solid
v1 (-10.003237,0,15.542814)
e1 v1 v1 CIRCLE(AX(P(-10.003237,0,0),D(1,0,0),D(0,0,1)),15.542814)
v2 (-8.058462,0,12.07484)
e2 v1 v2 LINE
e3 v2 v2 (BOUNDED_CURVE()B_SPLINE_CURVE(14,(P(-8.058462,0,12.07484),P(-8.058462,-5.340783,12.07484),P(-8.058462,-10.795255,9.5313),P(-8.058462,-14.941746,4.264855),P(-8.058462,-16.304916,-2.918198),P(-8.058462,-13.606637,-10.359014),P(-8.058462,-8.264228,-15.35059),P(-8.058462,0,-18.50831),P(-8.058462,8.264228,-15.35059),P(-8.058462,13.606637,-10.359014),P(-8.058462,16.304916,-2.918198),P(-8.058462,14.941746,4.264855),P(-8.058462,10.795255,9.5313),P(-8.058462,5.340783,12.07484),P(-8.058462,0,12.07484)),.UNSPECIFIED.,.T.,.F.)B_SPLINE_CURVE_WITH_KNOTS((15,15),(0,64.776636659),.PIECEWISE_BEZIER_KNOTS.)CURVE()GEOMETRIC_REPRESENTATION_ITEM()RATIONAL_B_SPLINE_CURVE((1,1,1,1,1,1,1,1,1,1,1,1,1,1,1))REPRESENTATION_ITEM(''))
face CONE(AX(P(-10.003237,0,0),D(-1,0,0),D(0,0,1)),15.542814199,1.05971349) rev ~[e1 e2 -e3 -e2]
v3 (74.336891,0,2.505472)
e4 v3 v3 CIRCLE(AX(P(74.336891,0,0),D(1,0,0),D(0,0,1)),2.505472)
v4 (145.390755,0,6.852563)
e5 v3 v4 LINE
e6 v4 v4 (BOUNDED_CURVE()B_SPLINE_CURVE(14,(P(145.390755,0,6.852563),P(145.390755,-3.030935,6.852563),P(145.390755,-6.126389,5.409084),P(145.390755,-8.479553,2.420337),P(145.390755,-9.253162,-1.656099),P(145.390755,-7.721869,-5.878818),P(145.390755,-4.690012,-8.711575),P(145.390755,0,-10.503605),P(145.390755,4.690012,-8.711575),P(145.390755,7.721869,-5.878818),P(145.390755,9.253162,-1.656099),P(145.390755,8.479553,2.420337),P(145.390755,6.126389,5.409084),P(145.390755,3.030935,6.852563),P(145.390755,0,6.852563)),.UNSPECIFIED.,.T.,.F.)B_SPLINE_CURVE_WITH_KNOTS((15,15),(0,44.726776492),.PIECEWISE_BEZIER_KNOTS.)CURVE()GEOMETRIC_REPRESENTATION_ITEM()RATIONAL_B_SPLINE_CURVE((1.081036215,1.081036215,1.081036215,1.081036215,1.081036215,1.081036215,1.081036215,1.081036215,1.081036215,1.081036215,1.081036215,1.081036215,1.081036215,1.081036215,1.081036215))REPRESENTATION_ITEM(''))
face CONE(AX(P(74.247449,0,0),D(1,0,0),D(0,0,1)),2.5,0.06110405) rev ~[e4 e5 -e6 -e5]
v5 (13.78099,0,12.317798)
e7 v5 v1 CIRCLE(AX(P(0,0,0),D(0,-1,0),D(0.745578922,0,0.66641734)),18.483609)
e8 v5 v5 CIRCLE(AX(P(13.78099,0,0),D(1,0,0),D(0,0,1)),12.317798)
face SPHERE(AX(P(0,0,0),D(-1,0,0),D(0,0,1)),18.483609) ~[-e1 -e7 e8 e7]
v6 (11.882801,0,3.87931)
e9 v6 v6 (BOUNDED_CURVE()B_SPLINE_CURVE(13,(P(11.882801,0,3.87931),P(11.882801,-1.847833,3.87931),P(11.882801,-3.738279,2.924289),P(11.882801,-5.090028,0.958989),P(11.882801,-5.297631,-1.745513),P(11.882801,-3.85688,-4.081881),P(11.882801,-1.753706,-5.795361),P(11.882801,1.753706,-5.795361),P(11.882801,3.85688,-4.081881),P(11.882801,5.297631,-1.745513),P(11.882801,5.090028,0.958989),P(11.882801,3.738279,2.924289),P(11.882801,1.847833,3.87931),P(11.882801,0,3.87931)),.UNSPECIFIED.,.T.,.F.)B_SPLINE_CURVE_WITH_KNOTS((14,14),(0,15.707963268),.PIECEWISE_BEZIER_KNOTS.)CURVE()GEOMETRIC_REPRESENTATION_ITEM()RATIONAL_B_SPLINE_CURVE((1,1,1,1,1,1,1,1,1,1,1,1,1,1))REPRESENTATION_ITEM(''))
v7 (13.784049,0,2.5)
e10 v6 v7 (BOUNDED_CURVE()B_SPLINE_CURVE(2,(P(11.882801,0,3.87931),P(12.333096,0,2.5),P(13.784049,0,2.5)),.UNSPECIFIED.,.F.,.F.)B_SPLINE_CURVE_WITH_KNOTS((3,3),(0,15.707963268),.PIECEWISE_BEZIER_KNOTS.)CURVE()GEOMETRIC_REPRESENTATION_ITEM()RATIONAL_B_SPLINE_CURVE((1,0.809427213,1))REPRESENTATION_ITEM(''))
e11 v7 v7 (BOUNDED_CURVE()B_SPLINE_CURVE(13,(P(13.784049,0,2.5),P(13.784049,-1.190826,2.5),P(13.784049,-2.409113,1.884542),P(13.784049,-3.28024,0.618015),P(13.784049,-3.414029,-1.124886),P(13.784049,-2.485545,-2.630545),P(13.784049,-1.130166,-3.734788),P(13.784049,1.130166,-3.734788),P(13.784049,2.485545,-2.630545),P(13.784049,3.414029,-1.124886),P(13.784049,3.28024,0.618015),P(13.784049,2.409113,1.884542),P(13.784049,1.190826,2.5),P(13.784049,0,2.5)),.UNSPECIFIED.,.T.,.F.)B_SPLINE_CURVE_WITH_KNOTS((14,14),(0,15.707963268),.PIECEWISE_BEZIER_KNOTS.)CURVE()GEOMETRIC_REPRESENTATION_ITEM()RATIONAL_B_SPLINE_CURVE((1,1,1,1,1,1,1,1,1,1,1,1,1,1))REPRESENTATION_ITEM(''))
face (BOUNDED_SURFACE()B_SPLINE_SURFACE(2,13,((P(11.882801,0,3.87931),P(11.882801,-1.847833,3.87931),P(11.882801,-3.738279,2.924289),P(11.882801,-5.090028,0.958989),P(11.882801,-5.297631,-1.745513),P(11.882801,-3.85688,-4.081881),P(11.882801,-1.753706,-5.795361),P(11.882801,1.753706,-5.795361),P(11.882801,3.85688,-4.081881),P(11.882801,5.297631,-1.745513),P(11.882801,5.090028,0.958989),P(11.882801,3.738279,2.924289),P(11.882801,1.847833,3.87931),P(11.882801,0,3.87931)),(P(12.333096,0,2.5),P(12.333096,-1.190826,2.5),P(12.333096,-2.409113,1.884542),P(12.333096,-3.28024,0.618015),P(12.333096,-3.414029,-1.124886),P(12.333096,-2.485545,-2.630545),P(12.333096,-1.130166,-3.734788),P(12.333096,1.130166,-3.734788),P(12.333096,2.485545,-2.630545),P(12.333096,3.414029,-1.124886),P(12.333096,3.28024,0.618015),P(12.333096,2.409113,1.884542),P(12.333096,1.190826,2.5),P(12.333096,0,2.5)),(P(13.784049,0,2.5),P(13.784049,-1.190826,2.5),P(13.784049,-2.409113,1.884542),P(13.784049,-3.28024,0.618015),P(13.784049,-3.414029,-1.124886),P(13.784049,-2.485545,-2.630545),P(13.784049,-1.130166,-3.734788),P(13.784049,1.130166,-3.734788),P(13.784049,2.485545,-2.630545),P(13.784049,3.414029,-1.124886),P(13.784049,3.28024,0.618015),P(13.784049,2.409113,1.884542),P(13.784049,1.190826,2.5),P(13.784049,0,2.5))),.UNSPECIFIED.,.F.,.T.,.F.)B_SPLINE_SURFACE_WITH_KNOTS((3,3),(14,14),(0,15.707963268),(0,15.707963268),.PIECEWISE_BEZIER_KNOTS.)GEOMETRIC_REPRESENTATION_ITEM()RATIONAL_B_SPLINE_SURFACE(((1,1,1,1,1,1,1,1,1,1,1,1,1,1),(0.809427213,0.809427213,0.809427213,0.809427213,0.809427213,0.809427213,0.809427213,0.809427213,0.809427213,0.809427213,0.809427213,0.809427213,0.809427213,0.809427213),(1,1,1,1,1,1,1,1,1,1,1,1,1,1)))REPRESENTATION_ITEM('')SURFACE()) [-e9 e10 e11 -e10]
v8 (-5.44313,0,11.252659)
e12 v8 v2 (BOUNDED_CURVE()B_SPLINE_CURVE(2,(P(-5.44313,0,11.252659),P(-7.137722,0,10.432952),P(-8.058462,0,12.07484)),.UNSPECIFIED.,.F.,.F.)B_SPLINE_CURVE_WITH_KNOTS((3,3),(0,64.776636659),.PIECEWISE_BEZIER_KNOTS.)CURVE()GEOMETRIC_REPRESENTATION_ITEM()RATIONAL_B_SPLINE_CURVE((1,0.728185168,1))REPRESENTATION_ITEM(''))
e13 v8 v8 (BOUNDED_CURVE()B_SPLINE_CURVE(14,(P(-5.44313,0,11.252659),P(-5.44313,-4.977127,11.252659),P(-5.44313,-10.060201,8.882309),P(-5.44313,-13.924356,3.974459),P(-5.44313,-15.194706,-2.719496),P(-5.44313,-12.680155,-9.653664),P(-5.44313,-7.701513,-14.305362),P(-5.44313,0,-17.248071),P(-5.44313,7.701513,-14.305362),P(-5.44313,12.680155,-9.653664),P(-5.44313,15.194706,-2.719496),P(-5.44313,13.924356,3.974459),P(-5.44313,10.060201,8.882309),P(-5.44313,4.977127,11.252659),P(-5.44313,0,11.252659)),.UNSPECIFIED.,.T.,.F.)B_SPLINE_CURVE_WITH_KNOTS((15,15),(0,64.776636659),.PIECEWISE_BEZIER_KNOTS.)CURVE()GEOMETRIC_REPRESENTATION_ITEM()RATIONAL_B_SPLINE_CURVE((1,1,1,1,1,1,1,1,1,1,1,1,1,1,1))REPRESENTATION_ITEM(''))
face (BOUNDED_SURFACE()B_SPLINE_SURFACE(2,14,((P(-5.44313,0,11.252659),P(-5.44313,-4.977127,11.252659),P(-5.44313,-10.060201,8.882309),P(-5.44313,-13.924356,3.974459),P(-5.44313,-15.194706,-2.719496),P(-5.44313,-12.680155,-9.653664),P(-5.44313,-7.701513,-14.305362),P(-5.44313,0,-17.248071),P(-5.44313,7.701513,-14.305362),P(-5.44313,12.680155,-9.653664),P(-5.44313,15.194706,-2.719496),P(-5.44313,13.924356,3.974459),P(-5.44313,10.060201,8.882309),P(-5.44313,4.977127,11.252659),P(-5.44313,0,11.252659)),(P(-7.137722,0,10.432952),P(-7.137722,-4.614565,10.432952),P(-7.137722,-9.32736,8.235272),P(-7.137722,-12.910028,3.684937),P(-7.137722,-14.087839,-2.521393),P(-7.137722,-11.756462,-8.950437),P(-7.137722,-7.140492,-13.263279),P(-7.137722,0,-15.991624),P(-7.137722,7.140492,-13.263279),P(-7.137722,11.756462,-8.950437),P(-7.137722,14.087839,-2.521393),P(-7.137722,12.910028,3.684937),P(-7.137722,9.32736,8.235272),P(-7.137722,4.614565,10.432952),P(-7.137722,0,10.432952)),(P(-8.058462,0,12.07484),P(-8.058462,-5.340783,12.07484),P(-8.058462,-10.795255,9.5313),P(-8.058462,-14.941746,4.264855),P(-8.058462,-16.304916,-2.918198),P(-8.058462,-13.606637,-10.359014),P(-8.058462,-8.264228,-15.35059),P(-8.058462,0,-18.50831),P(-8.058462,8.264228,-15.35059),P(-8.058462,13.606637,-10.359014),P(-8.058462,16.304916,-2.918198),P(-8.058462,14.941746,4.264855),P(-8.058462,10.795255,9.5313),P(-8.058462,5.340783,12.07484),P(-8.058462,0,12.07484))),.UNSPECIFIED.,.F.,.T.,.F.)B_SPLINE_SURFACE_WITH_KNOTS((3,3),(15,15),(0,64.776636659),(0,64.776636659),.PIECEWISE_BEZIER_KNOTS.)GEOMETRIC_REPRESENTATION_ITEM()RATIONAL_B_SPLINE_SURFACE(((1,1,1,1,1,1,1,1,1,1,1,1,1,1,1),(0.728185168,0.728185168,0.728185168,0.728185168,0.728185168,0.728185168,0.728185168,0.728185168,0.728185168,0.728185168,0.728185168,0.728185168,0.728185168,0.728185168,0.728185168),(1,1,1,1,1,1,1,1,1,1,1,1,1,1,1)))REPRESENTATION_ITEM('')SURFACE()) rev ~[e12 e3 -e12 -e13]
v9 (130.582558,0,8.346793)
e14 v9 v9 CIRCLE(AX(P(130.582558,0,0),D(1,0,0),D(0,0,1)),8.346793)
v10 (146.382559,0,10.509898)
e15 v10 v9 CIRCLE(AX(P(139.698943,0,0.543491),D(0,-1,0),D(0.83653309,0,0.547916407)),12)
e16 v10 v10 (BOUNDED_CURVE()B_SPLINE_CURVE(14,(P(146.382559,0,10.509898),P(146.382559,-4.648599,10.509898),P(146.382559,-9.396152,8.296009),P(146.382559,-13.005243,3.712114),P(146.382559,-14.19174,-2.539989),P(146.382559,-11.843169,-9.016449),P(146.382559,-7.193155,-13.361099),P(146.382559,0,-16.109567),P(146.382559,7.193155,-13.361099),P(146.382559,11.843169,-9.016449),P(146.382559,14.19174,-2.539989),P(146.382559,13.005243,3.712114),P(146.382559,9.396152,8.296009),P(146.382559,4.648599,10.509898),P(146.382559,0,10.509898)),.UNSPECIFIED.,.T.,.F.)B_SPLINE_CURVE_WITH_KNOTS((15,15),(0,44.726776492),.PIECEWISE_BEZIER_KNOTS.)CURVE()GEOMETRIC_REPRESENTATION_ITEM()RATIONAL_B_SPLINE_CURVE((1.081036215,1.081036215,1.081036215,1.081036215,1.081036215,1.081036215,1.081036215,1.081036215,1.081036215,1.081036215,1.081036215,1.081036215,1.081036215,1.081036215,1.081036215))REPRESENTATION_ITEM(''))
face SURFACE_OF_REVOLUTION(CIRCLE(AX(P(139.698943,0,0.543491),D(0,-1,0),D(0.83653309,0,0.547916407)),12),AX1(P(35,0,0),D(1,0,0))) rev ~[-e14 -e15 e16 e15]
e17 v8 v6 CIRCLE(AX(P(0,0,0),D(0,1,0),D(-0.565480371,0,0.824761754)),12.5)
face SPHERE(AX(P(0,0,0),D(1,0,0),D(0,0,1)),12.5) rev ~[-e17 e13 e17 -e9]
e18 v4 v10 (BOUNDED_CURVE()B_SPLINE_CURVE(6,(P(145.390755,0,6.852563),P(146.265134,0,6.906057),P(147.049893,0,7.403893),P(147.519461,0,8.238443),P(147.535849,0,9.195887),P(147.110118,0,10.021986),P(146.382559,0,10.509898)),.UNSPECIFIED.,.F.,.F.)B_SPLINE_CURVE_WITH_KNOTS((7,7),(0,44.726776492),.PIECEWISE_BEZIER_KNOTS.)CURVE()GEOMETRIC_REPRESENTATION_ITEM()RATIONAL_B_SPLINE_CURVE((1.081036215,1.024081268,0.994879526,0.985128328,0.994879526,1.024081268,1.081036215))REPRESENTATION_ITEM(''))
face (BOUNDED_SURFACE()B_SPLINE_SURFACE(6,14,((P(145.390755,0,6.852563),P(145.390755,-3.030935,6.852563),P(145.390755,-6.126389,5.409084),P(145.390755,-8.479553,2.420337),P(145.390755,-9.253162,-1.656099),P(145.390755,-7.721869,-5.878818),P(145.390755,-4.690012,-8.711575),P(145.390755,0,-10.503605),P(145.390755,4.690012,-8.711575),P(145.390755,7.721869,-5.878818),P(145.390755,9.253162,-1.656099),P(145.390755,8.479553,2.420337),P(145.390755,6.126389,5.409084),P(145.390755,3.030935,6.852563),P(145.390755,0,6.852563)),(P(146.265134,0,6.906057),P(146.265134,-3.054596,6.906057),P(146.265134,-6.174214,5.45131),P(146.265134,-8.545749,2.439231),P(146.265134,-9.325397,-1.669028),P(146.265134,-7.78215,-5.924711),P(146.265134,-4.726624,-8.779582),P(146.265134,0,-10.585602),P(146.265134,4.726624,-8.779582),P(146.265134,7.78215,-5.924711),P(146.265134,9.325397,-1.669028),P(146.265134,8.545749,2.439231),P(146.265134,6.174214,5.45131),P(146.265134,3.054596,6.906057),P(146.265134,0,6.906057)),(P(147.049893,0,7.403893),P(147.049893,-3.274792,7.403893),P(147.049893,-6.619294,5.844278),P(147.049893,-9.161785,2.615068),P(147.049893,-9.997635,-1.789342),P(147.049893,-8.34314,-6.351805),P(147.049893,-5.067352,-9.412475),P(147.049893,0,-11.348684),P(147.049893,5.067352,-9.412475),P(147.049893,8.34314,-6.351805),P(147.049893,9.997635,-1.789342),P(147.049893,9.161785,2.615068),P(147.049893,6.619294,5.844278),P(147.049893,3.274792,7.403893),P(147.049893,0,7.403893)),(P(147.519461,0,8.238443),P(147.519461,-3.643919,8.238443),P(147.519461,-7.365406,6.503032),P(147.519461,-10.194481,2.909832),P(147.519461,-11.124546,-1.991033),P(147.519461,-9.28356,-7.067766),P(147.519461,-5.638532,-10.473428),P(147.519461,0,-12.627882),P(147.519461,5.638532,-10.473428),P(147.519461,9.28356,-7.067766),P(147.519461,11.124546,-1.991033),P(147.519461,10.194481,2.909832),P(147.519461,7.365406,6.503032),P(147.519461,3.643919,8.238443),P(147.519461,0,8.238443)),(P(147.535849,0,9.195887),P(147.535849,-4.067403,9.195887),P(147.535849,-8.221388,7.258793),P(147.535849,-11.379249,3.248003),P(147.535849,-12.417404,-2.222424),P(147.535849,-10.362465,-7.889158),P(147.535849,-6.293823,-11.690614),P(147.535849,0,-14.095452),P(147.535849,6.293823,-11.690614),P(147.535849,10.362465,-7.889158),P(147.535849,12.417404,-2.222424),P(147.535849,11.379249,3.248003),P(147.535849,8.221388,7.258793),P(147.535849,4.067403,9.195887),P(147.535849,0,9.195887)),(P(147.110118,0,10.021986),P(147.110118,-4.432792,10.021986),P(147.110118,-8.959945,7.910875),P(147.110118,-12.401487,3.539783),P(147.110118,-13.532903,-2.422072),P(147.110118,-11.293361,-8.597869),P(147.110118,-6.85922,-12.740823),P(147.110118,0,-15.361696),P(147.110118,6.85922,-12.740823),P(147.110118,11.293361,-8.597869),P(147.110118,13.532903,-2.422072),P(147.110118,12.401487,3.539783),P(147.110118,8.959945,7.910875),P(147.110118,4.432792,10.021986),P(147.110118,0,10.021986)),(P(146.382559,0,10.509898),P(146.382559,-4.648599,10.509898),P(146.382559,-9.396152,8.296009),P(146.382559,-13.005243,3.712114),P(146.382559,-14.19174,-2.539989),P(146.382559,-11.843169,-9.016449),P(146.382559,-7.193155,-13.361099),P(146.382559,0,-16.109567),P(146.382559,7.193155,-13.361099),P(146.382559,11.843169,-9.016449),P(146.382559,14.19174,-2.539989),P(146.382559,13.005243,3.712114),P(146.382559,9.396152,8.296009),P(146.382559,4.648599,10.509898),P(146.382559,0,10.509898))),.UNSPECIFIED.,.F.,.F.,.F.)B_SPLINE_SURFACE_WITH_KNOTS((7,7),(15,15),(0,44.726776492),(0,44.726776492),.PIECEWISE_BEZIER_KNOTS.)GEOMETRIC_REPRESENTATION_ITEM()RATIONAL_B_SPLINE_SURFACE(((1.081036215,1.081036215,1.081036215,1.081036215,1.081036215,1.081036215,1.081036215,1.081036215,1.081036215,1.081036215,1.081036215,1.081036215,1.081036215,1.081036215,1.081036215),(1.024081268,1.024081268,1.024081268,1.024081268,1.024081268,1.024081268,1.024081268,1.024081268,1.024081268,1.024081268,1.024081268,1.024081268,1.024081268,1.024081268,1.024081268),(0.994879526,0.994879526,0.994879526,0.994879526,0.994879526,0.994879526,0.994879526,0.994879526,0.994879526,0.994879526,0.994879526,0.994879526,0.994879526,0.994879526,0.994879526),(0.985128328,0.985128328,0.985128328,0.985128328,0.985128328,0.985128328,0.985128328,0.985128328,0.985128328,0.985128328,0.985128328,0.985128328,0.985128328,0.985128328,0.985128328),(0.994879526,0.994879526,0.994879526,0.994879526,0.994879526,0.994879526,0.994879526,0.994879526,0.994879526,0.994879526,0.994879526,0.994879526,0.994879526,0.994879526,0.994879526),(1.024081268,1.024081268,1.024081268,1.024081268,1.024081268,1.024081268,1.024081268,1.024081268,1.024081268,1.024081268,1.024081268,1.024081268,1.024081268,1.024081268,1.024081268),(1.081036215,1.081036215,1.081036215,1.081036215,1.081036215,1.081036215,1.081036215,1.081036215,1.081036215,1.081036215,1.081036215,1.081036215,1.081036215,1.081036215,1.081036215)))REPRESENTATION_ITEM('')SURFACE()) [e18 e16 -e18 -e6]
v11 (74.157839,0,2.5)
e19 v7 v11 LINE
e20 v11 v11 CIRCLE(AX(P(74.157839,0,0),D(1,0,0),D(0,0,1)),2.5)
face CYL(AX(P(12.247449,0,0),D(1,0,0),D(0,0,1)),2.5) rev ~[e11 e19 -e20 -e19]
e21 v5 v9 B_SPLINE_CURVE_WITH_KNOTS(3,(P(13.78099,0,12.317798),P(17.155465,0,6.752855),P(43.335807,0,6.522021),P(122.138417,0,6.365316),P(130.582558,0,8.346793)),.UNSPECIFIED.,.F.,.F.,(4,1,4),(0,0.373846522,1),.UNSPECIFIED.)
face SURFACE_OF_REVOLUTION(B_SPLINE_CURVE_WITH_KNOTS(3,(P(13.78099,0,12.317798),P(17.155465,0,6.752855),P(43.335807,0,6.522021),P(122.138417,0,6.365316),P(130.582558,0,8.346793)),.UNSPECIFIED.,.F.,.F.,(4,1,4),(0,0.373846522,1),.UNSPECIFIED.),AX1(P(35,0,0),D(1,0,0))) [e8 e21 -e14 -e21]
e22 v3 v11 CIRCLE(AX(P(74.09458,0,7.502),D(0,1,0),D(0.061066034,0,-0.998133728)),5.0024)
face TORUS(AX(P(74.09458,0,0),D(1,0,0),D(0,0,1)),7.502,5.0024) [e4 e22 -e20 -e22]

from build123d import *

# Parameters (mm, degrees)
F2_R = 2


# Not quite as in the source:
# - a fillet or chamfer that OpenCascade refuses, or shapes differently, is made with other operations: its cross-section is extruded or revolved along the edge and cut away or added


with BuildPart() as f1:
    # F0 (on Front) → F1 (revolve)
    with BuildSketch(Plane.XZ):
        with BuildLine():
            ThreePointArc((-7.0685046336, 10.3095219212), (4.6853520259, 11.5886788028), (12.2474487139, 2.5))
            Line((12.2474487139, 2.5), (74.2474487139, 2.5))
            Line((74.2474487139, 2.5), (149.7373398729, 7.1184875673))
            ThreePointArc((149.7373398729, 7.1184875673), (140.4668689382, 12.5188941968), (130.5825582503, 8.3467933662))
            add(Edge.make_bspline(
                [(13.7809895682, 12.3177978136), (17.1554645129, 6.7528548074), (43.3358067225, 6.5220205059), (122.1384170347, 6.3653155344), (130.5825582503, 8.3467933662)],
                knots=[0, 0, 0, 0, 0.3738465221, 1, 1, 1, 1], degree=3))
            ThreePointArc((13.7809895682, 12.3177978136), (2.4835532955, 18.3159979112), (-10.003236638, 15.5428141988))
            Line((-10.003236638, 15.5428141988), (-7.0685046336, 10.3095219212))
        make_face()
    revolve(axis=Axis((35, 0, 0), (1, 0, 0)))

    # F2
    f2_edges = [f1.edges().sort_by_distance(p)[0] for p in [
        (149.73734, 0, -7.118488),
        (-7.068505, 0, -10.309522),
        (12.247449, 0, -2.5),
    ]]
    fillet(f2_edges, radius=F2_R)

    # F3: fillet of radius 5 on 1 edges, made by hand

    # F3_s1 → F3_t2 (revolve, cut)
    with BuildSketch(Plane.XZ):
        with BuildLine():
            ThreePointArc((74.4000566425, 2.5089358376), (74.2473895925, 2.5019345041), (74.094579917, 2.4996))
            Line((74.094579917, 2.4996), (74.094579917, 1.99936))
            ThreePointArc((74.094579917, 1.99936), (74.1710143155, 1.99976), (74.2474487139, 1.99976))
            Line((74.2474487139, 1.99976), (74.2779963865, 2.0006935838))
            ThreePointArc((74.2779963865, 2.0006935838), (74.3542881375, 2.0053611293), (74.430604315, 2.0096294213))
            Line((74.430604315, 2.0096294213), (74.4000566425, 2.5089358376))
        make_face()
    revolve(axis=Axis((74.2474487139, 0, 0), (1, 0, 0)), mode=Mode.SUBTRACT)


solid = f1.part
